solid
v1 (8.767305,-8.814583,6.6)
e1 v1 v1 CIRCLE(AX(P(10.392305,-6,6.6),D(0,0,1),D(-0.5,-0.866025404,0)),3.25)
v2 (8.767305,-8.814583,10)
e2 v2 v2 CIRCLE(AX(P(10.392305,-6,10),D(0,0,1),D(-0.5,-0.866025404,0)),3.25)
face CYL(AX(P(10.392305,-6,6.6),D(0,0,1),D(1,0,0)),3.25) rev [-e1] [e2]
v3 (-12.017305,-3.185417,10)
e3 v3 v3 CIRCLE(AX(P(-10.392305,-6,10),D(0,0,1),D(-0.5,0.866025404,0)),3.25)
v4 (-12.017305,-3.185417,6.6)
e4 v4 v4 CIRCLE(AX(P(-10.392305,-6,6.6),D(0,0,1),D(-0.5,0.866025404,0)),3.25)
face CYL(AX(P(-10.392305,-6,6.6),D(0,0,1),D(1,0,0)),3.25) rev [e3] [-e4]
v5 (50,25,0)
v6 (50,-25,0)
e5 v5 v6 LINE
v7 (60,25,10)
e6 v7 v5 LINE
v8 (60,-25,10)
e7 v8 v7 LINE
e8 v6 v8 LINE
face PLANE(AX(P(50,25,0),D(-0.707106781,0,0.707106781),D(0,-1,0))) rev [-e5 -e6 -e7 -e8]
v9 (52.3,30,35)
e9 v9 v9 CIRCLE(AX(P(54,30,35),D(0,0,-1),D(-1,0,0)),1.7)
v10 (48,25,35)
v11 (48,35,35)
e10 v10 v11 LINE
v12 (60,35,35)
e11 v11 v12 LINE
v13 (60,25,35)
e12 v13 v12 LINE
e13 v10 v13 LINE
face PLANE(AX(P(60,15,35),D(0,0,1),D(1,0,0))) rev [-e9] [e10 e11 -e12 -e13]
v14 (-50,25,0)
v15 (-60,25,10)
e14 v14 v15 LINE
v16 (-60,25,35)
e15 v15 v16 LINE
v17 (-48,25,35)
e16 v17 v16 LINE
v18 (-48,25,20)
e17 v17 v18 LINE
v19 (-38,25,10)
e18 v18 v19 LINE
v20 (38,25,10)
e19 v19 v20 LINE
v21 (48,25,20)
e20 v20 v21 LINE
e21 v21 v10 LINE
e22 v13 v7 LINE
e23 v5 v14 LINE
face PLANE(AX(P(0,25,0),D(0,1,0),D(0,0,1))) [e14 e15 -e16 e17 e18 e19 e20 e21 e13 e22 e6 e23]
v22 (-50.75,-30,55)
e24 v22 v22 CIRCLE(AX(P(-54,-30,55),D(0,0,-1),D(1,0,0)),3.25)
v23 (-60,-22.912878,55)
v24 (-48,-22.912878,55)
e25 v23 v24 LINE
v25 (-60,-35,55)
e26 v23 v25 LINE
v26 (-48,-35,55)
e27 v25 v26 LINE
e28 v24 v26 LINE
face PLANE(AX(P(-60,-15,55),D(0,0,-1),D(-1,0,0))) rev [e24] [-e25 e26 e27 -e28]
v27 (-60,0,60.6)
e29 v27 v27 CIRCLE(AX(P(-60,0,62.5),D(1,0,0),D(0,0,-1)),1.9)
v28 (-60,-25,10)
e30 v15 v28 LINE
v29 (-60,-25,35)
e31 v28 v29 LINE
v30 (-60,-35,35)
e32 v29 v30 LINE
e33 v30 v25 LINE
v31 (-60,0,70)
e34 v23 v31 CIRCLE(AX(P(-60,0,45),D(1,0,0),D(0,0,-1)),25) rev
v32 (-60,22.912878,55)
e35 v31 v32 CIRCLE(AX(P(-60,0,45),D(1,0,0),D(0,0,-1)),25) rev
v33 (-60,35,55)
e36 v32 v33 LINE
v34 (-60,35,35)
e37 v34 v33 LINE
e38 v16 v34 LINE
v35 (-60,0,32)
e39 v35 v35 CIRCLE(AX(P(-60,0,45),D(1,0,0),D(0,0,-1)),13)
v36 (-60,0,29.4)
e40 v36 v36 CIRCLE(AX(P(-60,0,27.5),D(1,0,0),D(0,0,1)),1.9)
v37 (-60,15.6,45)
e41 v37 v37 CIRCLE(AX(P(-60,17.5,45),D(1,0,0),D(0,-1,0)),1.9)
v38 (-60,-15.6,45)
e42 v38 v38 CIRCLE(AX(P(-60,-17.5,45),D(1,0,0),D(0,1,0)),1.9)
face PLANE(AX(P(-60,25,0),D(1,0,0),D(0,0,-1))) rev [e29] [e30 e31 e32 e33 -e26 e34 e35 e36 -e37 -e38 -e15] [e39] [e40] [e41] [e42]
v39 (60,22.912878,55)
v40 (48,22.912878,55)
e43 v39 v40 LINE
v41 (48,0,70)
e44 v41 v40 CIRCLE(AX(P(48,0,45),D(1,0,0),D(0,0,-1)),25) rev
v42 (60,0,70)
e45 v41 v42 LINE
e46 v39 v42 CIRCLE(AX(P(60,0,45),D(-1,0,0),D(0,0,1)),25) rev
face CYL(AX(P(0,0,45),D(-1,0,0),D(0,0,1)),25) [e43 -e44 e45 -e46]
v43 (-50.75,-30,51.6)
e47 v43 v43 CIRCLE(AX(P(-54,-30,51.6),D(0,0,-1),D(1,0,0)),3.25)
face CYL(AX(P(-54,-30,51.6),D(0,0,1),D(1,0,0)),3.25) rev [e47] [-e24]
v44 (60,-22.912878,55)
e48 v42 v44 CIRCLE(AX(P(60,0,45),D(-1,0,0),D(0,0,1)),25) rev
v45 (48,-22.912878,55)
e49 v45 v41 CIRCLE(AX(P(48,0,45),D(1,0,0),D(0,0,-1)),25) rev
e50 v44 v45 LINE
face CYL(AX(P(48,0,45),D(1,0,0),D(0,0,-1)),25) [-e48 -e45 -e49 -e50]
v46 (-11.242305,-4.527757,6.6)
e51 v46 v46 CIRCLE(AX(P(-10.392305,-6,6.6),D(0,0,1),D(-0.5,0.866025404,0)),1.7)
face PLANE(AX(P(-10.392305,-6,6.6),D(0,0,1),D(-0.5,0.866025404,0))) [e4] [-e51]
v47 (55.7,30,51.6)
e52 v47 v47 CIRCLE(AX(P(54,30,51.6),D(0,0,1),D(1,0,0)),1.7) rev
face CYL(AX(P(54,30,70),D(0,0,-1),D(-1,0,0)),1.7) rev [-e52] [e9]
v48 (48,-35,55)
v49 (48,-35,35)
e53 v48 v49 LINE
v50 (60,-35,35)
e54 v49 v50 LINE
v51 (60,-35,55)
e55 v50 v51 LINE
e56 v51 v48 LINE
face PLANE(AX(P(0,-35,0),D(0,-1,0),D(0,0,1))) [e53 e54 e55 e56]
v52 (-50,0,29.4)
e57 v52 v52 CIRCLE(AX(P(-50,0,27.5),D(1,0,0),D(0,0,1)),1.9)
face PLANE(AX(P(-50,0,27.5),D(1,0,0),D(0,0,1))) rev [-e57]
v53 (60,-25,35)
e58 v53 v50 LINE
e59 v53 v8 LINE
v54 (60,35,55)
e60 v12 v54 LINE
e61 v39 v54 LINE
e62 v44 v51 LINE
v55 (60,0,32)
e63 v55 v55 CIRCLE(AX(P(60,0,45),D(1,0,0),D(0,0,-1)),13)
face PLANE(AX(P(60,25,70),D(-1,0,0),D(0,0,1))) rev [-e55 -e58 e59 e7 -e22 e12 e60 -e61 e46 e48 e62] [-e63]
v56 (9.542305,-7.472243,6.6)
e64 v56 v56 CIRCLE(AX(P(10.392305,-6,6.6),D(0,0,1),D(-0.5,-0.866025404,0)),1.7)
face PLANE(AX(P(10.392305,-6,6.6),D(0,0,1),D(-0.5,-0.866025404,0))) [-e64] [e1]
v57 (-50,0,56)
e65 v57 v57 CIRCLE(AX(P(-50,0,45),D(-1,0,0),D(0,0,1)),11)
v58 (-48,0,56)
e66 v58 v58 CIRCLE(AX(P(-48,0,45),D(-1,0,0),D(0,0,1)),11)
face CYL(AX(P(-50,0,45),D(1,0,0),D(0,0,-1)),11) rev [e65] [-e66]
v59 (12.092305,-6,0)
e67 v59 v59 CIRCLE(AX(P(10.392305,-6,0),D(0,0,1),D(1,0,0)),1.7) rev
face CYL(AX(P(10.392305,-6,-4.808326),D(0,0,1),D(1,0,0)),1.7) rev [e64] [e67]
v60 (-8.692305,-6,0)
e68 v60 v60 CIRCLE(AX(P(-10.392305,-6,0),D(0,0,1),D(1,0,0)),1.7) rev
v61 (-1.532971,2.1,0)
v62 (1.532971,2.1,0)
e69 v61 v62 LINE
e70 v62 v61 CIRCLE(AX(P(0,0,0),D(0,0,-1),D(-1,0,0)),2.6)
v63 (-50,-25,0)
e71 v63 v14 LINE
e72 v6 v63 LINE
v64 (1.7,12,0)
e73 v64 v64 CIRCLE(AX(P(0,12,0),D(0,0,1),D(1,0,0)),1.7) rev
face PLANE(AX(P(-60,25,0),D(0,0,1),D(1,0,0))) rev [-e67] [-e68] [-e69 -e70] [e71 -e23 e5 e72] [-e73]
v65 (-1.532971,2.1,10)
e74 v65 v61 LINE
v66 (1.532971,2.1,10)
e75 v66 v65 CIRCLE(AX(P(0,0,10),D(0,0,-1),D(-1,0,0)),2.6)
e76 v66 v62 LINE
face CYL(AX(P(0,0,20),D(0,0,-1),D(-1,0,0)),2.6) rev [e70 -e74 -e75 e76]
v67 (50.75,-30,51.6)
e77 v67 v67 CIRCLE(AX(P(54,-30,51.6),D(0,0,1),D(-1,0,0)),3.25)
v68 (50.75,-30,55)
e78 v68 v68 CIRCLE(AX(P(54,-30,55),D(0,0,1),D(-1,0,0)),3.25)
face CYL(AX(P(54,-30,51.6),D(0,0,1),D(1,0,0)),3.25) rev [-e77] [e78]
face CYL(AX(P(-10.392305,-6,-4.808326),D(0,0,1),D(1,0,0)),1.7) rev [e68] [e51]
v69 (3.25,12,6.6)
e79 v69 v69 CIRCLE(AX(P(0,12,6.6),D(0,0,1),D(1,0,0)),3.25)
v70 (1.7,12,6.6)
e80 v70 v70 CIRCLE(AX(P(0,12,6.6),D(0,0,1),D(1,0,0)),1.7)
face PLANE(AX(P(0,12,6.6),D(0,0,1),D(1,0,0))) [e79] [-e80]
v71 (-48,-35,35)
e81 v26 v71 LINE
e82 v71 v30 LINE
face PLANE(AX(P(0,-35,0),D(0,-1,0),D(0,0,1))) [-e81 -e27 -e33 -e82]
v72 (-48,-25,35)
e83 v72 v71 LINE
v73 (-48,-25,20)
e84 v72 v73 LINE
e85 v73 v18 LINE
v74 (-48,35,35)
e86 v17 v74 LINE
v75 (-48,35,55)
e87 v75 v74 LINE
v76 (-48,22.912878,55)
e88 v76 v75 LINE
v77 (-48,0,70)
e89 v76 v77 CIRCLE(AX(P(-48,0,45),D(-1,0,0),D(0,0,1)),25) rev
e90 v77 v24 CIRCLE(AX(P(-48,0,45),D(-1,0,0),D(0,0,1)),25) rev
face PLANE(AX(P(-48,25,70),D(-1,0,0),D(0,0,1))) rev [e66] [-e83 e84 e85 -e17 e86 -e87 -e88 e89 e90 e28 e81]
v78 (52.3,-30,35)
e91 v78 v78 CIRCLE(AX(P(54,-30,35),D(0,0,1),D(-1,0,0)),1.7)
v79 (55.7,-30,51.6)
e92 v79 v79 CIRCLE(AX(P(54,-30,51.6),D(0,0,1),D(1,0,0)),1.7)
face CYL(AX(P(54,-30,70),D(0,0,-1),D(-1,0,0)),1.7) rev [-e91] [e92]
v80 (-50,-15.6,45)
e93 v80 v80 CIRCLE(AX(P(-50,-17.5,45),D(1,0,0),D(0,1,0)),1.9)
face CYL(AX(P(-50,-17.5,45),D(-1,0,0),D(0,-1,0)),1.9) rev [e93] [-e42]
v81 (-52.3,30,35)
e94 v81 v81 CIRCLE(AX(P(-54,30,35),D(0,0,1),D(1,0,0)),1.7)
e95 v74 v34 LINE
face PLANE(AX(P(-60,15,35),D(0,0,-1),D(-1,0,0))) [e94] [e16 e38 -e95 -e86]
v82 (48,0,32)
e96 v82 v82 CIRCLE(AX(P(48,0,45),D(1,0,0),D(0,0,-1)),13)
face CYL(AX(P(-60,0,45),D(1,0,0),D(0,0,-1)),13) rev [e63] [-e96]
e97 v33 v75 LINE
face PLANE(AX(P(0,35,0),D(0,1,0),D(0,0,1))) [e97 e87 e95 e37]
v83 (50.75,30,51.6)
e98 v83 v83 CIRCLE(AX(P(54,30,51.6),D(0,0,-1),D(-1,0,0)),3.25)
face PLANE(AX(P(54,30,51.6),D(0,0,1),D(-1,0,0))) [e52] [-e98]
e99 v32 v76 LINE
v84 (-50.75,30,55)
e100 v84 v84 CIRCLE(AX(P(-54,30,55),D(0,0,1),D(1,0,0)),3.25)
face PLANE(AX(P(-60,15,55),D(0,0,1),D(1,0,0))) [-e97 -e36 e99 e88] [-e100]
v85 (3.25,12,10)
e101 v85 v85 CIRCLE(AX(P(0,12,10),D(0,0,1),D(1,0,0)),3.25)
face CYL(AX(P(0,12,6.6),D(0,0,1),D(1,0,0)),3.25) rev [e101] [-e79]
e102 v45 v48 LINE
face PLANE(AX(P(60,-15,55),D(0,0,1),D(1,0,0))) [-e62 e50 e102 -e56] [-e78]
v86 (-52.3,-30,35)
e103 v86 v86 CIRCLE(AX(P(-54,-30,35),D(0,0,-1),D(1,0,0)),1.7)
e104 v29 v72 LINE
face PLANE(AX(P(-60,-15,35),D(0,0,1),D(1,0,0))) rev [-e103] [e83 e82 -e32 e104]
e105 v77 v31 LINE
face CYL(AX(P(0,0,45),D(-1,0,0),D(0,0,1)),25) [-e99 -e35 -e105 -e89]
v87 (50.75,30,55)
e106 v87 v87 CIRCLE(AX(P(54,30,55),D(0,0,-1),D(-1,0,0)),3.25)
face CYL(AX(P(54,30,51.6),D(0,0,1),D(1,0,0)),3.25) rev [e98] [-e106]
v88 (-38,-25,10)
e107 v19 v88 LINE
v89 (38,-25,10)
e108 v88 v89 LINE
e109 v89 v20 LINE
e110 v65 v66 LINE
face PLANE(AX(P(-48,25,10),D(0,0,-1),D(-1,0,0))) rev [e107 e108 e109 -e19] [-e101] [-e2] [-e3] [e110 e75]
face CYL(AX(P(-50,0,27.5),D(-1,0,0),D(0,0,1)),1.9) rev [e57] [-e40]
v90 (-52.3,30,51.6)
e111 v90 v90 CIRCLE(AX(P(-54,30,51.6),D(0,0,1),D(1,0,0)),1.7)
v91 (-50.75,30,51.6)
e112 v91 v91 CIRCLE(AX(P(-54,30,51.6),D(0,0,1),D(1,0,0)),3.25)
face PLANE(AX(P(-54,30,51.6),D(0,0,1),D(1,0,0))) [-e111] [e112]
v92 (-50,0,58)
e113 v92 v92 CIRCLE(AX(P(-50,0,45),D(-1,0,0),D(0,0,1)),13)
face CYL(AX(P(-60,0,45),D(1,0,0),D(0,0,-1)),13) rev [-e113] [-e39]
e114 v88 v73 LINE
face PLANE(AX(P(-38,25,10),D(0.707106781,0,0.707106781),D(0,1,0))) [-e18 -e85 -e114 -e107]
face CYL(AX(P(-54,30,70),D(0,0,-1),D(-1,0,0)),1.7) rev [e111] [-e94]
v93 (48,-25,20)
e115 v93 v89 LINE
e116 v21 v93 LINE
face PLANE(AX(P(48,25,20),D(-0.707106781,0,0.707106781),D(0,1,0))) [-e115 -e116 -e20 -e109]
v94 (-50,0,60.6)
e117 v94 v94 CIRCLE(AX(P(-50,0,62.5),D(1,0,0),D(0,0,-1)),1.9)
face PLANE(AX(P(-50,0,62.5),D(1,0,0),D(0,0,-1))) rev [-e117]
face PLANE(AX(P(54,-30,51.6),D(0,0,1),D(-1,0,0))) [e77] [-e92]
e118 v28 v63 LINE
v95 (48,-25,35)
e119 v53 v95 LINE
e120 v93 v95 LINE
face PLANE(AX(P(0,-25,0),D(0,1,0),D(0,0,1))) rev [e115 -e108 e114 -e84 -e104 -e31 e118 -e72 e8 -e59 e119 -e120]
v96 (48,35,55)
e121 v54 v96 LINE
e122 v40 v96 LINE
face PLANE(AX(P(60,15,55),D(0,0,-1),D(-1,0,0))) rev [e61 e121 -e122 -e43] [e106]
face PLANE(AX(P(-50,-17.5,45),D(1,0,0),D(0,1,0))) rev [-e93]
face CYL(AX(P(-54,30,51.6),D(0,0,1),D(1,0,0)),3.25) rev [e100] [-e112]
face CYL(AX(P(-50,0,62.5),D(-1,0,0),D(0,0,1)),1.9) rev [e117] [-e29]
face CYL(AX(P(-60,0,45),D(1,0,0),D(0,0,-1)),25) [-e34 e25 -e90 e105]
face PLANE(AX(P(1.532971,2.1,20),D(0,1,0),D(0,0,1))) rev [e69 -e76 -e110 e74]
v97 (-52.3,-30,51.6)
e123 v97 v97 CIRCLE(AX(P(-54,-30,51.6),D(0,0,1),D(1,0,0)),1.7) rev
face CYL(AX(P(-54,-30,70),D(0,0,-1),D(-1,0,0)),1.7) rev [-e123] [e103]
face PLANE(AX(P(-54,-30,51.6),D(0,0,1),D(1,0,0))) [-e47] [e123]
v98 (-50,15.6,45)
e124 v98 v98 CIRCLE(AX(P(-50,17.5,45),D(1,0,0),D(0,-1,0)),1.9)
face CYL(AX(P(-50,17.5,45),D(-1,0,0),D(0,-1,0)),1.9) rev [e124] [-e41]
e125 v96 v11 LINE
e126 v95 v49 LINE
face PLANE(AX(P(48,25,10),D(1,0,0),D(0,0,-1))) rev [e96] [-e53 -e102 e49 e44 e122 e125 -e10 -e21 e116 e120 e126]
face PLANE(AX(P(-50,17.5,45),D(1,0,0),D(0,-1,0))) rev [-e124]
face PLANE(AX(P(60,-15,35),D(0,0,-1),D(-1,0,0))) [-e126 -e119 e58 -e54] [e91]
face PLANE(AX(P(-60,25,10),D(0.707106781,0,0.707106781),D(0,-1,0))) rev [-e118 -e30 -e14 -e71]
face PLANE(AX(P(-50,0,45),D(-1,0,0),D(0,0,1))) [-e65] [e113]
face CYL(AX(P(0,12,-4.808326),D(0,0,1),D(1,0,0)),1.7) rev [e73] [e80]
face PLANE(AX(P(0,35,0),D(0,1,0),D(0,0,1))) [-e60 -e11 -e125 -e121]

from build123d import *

# Parameters (mm, degrees)
AUFSATZ_LINEAR_AUSTRAGEN1_DEPTH            = 25
SCHNITT_LINEAR_AUSTRAGEN1_DEPTH            = 20
FASE1_SIZE                                 = 10
VERRUNDUNG1_R                              = 25
SKIZZE3_R                                  = 3.25
SCHNITT_LINEAR_AUSTRAGEN2_DEPTH            = 3.4
SKIZZE4_R                                  = 1.7
SCHNITT_LINEAR_AUSTRAGEN3_DEPTH            = 6.6
KREISMUSTER1_COUNT                         = 3
SKIZZE5_R                                  = 13
SCHNITT_LINEAR_AUSTRAGEN4_DEPTH            = 142.155942135
SKIZZE7_W                                  = 12
SKIZZE7_H                                  = 20
AUFSATZ_LINEAR_AUSTRAGEN2_DEPTH            = 10
SKIZZE9_R                                  = 1.7
SCHNITT_LINEAR_AUSTRAGEN7_DEPTH            = 78.781745931
SKIZZE8_R                                  = 3.25
SCHNITT_LINEAR_AUSTRAGEN6_DEPTH            = 3.4
SKIZZE10_R                                 = 13
SKIZZE10_R_2                               = 11
AUFSATZ_LINEAR_AUSTRAGEN3_DEPTH            = 2
SPIEGELN1_AT_THE_SECOND_PLANE_COPY_1_SKE_W = 12
SPIEGELN1_AT_THE_SECOND_PLANE_COPY_1_SKE_H = 20
SPIEGELN1_AT_THE_SECOND_PLANE_COPY_1_DEPTH = 10
SPIEGELN1_AT_THE_SECOND_PLANE_COPY_2_SKE_R = 1.7
SPIEGELN1_AT_THE_SECOND_PLANE_COPY_2_DEPTH = 78.781745931
SPIEGELN1_AT_THE_SECOND_PLANE_COPY_3_SKE_R = 3.25
SPIEGELN1_AT_THE_SECOND_PLANE_COPY_3_DEPTH = 3.4
SKIZZE11_R                                 = 1.9
SCHNITT_LINEAR_AUSTRAGEN8_DEPTH            = 10
KREISMUSTER2_COUNT                         = 4


with BuildPart() as part:
    # Skizze1 → Aufsatz-Linear austragen1 (new, symmetric)
    with BuildSketch(Plane(origin=(0, 0, 0), x_dir=(1, 0, 0), z_dir=(0, 1, 0))):
        Polygon((-60, 0), (60, 0), (60, -70), (48, -70), (48, -10), (-48, -10), (-48, -70), (-60, -70), align=None)
    extrude(amount=AUFSATZ_LINEAR_AUSTRAGEN1_DEPTH, both=True)

    # Skizze2 → Schnitt-Linear austragen1 (cut)
    with BuildSketch(Plane(origin=(0, 0, 0), x_dir=(-1, 0, 0), z_dir=(0, 0, -1))):
        with BuildLine():
            Line((-1.532970972, 2.1), (1.532970972, 2.1))
            ThreePointArc((1.532970972, 2.1), (0, -2.6), (-1.532970972, 2.1))
        make_face()
    extrude(amount=-SCHNITT_LINEAR_AUSTRAGEN1_DEPTH, mode=Mode.SUBTRACT)

    # Fase1
    fase1_edges = [part.edges().sort_by_distance(p)[0] for p in [
        (-60, 0, 0),
        (60, 0, 0),
        (48, 0, 10),
        (-48, 0, 10),
    ]]
    chamfer(fase1_edges, length=FASE1_SIZE)

    # Verrundung1
    verrundung1_edges = [part.edges().sort_by_distance(p)[0] for p in [
        (-54, -25, 70),
        (-54, 25, 70),
        (54, 25, 70),
        (54, -25, 70),
    ]]
    fillet(verrundung1_edges, radius=VERRUNDUNG1_R - 0.0001)  # a hair under: the kernel refuses the full size

    # Skizze3 → Schnitt-Linear austragen2 (cut)
    with BuildSketch(Plane.XY.offset(10)):
        with Locations((0, 12)):
            Circle(SKIZZE3_R)
    schnitt_linear_austragen2 = extrude(amount=-SCHNITT_LINEAR_AUSTRAGEN2_DEPTH, mode=Mode.SUBTRACT)

    # Skizze4 → Schnitt-Linear austragen3 (cut)
    with BuildSketch(Plane.XY.offset(6.6)):
        with Locations((0, 12)):
            Circle(SKIZZE4_R)
    schnitt_linear_austragen3 = extrude(amount=-SCHNITT_LINEAR_AUSTRAGEN3_DEPTH, mode=Mode.SUBTRACT)

    # Kreismuster1: Schnitt-Linear austragen2, Schnitt-Linear austragen3 ×3 about axis
    kreismuster1_axis = Axis((0, 0, 0), (0, 0, 1))
    add([schnitt_linear_austragen2.rotate(kreismuster1_axis, i * 360 / KREISMUSTER1_COUNT) for i in range(1, KREISMUSTER1_COUNT)], mode=Mode.SUBTRACT)
    add([schnitt_linear_austragen3.rotate(kreismuster1_axis, i * 360 / KREISMUSTER1_COUNT) for i in range(1, KREISMUSTER1_COUNT)], mode=Mode.SUBTRACT)

    # Skizze5 → Schnitt-Linear austragen4 (cut, through all)
    with BuildSketch(Plane(origin=(60, 0, 0), x_dir=(0, 0, -1), z_dir=(1, 0, 0))):
        with Locations((-45, 0)):
            Circle(SKIZZE5_R)
    extrude(amount=-SCHNITT_LINEAR_AUSTRAGEN4_DEPTH, mode=Mode.SUBTRACT)

    # Skizze7 → Aufsatz-Linear austragen2 (add, symmetric)
    with BuildSketch(Plane(origin=(0, 25, 0), x_dir=(1, 0, 0), z_dir=(0, 1, 0))):
        with Locations((-54, -45)):
            Rectangle(SKIZZE7_W, SKIZZE7_H)
    aufsatz_linear_austragen2 = extrude(amount=AUFSATZ_LINEAR_AUSTRAGEN2_DEPTH, both=True)

    # Skizze9 → Schnitt-Linear austragen7 (cut, through all)
    with BuildSketch(Plane.XY.offset(35)):
        with Locations((-54, 30)):
            Circle(SKIZZE9_R)
    schnitt_linear_austragen7 = extrude(amount=SCHNITT_LINEAR_AUSTRAGEN7_DEPTH, mode=Mode.SUBTRACT)

    # Skizze8 → Schnitt-Linear austragen6 (cut)
    with BuildSketch(Plane.XY.offset(55)):
        with Locations((-54, 30)):
            Circle(SKIZZE8_R)
    schnitt_linear_austragen6 = extrude(amount=-SCHNITT_LINEAR_AUSTRAGEN6_DEPTH, mode=Mode.SUBTRACT)

    # Skizze10 → Aufsatz-Linear austragen3 (add)
    with BuildSketch(Plane.ZY.offset(48)):
        with Locations(Location((45, 0, 0), (0, 0, 180))):
            Circle(SKIZZE10_R)
        with Locations((45, 0)):
            Circle(SKIZZE10_R_2, mode=Mode.SUBTRACT)
    extrude(amount=AUFSATZ_LINEAR_AUSTRAGEN3_DEPTH)

    # Spiegeln1: Aufsatz-Linear austragen2, Schnitt-Linear austragen7, Schnitt-Linear austragen6 across plane
    add(aufsatz_linear_austragen2.mirror(Plane(origin=(0, 0, 0), x_dir=(0, 0, 1), z_dir=(1, 0, 0))))
    add(schnitt_linear_austragen7.mirror(Plane(origin=(0, 0, 0), x_dir=(0, 0, 1), z_dir=(1, 0, 0))), mode=Mode.SUBTRACT)
    add(schnitt_linear_austragen6.mirror(Plane(origin=(0, 0, 0), x_dir=(0, 0, 1), z_dir=(1, 0, 0))), mode=Mode.SUBTRACT)

    # Spiegeln1 at the second plane: Aufsatz-Linear austragen2, Schnitt-Linear austragen7, Schnitt-Linear austragen6 across plane
    add(aufsatz_linear_austragen2.mirror(Plane.ZX))
    add(schnitt_linear_austragen7.mirror(Plane.ZX), mode=Mode.SUBTRACT)
    add(schnitt_linear_austragen6.mirror(Plane.ZX), mode=Mode.SUBTRACT)

    # Spiegeln1 at the second plane copy 1 ske → Spiegeln1 at the second plane copy 1 (add, symmetric)
    with BuildSketch(Plane(origin=(0, -25, 0), x_dir=(-1, 0, 0), z_dir=(0, -1, 0))):
        with Locations((-54, -45)):
            Rectangle(SPIEGELN1_AT_THE_SECOND_PLANE_COPY_1_SKE_W, SPIEGELN1_AT_THE_SECOND_PLANE_COPY_1_SKE_H)
    extrude(amount=SPIEGELN1_AT_THE_SECOND_PLANE_COPY_1_DEPTH, both=True)

    # Spiegeln1 at the second plane copy 2 ske → Spiegeln1 at the second plane copy 2 (cut, through all)
    with BuildSketch(Plane(origin=(0, 0, 35), x_dir=(-1, 0, 0), z_dir=(0, 0, 1))):
        with Locations((-54, 30)):
            Circle(SPIEGELN1_AT_THE_SECOND_PLANE_COPY_2_SKE_R)
    extrude(amount=SPIEGELN1_AT_THE_SECOND_PLANE_COPY_2_DEPTH, mode=Mode.SUBTRACT)

    # Spiegeln1 at the second plane copy 3 ske → Spiegeln1 at the second plane copy 3 (cut)
    with BuildSketch(Plane(origin=(0, 0, 55), x_dir=(-1, 0, 0), z_dir=(0, 0, 1))):
        with Locations((-54, 30)):
            Circle(SPIEGELN1_AT_THE_SECOND_PLANE_COPY_3_SKE_R)
    extrude(amount=-SPIEGELN1_AT_THE_SECOND_PLANE_COPY_3_DEPTH, mode=Mode.SUBTRACT)

    # Skizze11 → Schnitt-Linear austragen8 (cut)
    with BuildSketch(Plane(origin=(-60, 0, 0), x_dir=(0, 0, -1), z_dir=(1, 0, 0))):
        with Locations((-62.5, 0)):
            Circle(SKIZZE11_R)
    schnitt_linear_austragen8 = extrude(amount=SCHNITT_LINEAR_AUSTRAGEN8_DEPTH, mode=Mode.SUBTRACT)

    # Kreismuster2: Schnitt-Linear austragen8 ×4 about axis
    kreismuster2_axis = Axis((0, 0, 45), (1, 0, 0))
    for i in range(1, KREISMUSTER2_COUNT):
        add(schnitt_linear_austragen8.rotate(kreismuster2_axis, i * 360 / KREISMUSTER2_COUNT), mode=Mode.SUBTRACT)


solid = part.part
